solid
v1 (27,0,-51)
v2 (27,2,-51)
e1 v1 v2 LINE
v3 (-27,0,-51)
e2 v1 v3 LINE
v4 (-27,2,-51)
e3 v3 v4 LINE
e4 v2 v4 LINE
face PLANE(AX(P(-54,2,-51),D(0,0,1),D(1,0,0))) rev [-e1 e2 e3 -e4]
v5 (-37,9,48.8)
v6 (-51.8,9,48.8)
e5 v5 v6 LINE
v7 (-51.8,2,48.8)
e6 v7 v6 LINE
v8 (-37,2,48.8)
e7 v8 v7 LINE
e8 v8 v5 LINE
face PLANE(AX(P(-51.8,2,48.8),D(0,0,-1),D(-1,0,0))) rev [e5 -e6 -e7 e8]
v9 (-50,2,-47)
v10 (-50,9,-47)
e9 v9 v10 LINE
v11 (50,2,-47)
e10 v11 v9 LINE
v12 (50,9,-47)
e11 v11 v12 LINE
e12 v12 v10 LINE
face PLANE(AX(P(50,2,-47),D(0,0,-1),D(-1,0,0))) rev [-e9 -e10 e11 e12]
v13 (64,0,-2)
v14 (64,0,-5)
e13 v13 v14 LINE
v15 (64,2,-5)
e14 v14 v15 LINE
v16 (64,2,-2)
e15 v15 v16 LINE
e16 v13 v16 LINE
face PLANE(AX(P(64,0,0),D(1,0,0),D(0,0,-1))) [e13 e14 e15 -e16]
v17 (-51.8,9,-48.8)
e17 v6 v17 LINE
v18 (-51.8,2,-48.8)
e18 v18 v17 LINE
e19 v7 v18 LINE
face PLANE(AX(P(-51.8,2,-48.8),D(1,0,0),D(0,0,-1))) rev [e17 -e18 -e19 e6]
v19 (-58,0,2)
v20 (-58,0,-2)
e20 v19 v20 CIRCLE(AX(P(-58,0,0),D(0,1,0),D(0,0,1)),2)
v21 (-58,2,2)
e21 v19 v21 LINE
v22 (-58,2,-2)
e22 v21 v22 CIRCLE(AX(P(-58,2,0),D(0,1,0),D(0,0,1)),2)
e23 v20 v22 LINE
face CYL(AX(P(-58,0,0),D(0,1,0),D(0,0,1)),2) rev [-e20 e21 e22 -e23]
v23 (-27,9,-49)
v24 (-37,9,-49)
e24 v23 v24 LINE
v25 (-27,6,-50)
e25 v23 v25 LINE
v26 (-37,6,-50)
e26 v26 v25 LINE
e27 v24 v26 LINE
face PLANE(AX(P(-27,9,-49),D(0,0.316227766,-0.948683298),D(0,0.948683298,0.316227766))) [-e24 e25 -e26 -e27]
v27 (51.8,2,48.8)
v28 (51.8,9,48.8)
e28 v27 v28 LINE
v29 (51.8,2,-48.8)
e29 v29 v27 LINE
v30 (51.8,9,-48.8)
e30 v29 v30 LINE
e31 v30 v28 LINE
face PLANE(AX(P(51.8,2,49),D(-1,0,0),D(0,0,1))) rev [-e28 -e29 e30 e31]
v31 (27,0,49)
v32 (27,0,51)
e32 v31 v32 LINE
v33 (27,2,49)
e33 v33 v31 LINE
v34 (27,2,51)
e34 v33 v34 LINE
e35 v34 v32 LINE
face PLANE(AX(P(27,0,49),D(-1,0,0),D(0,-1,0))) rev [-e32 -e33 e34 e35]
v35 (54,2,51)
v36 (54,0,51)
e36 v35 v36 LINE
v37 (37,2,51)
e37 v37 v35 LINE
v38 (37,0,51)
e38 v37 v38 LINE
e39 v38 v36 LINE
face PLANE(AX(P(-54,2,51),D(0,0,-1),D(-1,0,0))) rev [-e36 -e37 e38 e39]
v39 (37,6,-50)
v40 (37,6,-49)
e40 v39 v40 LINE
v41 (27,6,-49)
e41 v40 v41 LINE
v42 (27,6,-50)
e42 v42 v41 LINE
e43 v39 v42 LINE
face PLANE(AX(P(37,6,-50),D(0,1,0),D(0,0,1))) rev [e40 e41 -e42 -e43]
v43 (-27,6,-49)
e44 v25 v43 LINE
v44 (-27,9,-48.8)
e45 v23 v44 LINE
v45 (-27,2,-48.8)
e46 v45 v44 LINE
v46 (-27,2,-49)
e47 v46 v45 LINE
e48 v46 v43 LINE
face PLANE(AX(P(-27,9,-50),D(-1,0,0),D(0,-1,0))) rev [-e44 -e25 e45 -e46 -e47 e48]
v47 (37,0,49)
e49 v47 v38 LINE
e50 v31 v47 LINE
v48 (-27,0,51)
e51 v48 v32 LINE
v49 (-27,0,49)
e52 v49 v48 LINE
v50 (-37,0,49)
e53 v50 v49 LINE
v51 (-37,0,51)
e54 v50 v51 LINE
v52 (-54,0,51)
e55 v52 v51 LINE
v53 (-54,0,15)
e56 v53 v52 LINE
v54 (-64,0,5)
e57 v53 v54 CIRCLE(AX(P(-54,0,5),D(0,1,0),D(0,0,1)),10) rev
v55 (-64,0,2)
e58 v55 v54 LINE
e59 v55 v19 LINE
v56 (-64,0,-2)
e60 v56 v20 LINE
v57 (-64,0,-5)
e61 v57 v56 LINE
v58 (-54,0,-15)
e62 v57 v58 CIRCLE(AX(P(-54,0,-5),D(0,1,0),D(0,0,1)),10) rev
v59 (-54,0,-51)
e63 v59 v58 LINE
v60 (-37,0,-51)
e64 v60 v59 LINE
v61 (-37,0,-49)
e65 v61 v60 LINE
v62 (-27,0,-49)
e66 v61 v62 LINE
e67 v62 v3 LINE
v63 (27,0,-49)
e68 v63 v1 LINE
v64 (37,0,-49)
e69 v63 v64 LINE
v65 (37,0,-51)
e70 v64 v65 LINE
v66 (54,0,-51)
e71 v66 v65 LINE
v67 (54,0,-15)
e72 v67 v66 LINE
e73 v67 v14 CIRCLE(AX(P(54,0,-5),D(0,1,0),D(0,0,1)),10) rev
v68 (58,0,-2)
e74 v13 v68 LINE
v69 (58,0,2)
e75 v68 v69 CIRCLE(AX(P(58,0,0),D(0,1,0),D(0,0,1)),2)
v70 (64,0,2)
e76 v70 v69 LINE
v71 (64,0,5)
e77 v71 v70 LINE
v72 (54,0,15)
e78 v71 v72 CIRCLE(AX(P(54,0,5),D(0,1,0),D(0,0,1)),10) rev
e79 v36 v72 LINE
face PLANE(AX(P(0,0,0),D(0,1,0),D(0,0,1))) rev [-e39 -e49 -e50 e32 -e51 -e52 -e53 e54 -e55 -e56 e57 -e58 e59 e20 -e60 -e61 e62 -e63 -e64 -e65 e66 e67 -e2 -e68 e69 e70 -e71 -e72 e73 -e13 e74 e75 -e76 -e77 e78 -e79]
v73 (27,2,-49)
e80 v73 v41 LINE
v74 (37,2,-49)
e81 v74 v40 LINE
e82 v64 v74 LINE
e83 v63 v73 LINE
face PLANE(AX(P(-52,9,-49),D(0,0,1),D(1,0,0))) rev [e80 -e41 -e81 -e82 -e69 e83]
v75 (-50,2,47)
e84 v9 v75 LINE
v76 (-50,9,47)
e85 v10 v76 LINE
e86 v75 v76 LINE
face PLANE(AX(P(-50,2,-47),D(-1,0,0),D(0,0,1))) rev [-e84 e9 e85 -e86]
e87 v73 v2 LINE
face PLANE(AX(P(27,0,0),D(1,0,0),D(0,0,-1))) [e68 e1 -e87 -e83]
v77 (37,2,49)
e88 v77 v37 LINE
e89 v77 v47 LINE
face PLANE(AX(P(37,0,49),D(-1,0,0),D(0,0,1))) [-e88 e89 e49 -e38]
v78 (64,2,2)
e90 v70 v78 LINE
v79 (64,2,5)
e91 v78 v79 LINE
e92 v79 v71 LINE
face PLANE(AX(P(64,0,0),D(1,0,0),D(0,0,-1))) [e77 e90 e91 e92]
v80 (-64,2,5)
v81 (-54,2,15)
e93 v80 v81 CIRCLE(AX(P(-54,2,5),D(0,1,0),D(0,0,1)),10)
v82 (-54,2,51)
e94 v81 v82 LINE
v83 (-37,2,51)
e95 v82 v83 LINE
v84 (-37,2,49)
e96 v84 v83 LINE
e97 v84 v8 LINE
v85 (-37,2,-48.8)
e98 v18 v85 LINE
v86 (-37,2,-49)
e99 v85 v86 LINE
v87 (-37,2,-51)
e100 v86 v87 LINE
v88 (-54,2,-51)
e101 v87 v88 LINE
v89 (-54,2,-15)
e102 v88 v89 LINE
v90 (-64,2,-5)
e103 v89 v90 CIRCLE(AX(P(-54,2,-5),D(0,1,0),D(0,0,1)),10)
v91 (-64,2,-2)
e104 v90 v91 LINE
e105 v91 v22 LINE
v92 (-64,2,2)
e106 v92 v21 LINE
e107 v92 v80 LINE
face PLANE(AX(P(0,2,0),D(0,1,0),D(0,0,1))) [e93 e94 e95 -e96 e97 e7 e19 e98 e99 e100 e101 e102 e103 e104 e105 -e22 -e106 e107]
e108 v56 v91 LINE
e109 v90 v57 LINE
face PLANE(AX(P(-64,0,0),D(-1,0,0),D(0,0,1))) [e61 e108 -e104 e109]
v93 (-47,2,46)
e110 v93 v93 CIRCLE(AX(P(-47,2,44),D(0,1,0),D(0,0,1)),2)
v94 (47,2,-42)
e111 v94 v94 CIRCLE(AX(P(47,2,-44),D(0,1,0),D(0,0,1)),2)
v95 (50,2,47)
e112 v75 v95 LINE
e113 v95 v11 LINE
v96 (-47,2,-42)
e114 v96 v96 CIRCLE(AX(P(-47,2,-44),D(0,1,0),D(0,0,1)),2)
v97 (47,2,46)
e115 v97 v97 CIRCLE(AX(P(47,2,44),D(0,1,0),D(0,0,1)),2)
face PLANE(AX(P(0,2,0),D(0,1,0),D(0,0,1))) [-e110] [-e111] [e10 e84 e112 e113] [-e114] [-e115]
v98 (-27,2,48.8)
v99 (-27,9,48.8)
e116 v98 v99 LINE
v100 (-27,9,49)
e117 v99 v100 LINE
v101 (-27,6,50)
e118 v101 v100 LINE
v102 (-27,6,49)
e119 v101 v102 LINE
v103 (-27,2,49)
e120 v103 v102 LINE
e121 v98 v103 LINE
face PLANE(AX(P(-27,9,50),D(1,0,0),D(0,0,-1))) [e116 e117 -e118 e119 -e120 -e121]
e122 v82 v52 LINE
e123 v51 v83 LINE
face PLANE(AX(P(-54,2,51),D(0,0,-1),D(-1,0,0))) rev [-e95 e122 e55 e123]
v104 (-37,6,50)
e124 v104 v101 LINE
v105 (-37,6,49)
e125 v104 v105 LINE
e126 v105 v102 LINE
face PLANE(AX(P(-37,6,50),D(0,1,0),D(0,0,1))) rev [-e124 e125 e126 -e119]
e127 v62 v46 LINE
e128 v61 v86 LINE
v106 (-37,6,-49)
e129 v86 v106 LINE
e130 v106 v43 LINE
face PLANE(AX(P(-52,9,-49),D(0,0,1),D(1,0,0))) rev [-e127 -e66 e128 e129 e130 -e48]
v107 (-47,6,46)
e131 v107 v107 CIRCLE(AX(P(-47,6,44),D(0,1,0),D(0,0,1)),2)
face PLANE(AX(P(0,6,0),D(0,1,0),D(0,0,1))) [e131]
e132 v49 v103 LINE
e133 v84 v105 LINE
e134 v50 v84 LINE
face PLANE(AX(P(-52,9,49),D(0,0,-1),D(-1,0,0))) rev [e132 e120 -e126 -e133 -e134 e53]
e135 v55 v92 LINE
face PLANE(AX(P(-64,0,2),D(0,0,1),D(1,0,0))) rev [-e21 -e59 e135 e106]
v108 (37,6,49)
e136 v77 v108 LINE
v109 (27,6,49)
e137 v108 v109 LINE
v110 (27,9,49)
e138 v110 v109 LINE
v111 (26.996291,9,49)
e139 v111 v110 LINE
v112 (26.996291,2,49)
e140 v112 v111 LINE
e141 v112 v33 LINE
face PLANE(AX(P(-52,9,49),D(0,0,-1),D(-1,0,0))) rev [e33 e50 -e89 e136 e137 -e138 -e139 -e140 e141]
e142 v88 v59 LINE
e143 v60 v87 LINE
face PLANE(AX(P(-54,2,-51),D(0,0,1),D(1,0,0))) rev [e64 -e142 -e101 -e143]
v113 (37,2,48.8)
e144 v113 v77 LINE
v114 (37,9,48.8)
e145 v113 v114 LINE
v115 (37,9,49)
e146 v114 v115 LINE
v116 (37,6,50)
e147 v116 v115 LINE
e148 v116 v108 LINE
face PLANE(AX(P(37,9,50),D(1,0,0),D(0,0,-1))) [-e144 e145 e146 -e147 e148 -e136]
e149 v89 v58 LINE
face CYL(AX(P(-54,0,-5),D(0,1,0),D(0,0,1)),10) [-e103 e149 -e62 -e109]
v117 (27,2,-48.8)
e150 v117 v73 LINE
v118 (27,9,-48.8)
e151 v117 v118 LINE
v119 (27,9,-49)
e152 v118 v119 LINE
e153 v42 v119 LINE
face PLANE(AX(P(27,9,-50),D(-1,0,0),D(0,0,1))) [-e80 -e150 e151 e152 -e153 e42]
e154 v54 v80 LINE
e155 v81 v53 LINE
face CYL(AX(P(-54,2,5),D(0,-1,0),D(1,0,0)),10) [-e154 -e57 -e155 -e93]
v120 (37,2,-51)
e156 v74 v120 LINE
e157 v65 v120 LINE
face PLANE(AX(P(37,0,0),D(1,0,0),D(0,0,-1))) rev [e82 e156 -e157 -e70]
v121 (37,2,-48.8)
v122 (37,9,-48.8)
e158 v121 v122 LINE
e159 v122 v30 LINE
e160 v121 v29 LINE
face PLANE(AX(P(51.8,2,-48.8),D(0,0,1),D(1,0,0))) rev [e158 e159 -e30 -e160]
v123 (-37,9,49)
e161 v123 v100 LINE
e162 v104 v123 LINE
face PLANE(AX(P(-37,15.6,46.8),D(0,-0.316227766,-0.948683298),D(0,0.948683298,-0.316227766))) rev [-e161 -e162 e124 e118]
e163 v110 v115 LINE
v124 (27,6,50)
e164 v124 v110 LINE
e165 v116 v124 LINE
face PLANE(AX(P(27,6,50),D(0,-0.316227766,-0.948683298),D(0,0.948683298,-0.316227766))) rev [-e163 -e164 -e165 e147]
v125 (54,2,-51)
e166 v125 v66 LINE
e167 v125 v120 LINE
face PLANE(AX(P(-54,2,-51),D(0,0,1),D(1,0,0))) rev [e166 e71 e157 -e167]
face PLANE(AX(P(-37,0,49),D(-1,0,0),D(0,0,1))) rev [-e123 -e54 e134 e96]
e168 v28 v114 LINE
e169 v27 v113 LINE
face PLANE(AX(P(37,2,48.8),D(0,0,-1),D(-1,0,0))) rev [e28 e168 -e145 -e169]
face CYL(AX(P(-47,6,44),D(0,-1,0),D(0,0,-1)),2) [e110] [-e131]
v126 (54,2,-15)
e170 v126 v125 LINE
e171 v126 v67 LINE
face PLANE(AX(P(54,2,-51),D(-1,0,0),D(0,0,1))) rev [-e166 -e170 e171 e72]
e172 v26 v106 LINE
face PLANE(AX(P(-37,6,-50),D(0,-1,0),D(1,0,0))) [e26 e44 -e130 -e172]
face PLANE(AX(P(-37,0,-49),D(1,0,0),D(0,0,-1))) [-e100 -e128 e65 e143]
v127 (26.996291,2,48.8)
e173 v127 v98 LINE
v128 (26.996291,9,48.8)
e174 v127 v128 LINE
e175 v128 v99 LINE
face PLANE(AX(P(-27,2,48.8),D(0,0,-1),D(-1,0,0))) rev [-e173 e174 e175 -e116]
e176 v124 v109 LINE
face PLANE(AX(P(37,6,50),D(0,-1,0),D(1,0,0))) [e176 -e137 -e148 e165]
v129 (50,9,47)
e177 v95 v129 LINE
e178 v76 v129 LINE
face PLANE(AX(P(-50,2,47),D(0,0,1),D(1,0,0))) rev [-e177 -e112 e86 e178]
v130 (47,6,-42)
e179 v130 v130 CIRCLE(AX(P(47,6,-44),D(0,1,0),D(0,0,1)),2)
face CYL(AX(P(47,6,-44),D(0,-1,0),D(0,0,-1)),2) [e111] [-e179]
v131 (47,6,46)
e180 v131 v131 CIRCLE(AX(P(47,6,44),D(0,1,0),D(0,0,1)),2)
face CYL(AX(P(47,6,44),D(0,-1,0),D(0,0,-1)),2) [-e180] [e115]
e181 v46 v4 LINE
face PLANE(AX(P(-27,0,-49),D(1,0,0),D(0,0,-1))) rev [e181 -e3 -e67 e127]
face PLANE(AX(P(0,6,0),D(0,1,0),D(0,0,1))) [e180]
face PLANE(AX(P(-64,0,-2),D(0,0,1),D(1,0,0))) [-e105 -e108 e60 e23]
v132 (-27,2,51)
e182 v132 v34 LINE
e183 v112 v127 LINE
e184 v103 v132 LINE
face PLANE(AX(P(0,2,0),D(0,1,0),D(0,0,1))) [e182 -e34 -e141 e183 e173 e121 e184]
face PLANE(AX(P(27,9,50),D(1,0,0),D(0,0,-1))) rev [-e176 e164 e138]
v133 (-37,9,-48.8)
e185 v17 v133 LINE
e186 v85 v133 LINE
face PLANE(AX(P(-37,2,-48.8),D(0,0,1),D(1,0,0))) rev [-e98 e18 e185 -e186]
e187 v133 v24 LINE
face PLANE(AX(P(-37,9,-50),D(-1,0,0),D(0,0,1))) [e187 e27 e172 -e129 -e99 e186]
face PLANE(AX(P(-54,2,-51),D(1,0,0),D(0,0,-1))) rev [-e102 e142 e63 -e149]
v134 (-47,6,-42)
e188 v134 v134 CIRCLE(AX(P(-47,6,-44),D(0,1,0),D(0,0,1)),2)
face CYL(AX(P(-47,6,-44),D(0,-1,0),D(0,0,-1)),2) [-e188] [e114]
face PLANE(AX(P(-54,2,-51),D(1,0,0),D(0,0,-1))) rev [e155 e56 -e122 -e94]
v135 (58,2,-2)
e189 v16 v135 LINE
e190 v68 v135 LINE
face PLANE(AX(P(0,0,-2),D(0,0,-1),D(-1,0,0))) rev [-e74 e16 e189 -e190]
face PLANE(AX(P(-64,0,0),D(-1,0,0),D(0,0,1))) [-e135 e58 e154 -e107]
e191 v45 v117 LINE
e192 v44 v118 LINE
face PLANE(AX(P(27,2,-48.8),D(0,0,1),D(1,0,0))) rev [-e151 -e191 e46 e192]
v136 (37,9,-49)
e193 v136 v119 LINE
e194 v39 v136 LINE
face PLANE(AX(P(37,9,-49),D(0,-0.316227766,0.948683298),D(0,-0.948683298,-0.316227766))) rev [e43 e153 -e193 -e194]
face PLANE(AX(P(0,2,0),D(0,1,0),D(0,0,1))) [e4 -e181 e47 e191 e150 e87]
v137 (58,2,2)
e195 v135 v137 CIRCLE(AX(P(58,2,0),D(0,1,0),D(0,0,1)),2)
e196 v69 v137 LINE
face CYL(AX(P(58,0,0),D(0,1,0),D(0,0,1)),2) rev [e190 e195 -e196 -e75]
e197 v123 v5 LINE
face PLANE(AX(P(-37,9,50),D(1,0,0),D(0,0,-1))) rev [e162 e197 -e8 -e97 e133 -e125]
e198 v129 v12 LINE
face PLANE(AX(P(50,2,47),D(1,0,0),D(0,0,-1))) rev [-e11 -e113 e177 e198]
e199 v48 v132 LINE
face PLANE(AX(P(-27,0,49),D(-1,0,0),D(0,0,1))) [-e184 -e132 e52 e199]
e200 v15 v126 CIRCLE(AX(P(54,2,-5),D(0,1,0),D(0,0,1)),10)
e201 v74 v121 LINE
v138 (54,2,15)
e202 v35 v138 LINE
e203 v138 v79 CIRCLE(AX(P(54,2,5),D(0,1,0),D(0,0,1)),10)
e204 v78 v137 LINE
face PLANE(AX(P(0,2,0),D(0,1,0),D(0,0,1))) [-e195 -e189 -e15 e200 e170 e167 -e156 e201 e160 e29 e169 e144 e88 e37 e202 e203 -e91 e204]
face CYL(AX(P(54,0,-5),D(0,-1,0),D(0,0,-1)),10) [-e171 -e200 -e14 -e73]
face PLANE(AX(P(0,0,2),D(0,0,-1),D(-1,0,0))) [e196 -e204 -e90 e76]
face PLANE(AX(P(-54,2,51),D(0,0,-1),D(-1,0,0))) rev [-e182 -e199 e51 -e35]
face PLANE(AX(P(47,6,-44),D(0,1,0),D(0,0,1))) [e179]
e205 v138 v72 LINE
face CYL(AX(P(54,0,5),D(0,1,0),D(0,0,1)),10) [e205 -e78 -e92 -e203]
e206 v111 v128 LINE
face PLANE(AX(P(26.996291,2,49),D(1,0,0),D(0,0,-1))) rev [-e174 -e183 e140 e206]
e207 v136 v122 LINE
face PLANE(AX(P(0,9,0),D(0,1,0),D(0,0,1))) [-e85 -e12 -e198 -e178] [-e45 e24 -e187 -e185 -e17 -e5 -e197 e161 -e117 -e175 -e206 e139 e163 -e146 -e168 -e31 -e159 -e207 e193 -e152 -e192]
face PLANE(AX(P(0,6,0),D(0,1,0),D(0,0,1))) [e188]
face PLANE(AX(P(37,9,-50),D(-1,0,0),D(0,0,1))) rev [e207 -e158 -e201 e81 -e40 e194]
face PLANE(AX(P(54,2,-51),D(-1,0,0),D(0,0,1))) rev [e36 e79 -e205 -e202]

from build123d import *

# Parameters (mm, degrees)
SKETCH1_W            = 108
SKETCH1_H            = 102
BOSS_EXTRUDE1_DEPTH  = 2
SKETCH2_W            = 104
SKETCH2_H            = 98
BOSS_EXTRUDE2_DEPTH  = 7
SKETCH3_W            = 100
SKETCH3_H            = 94
CUT_EXTRUDE1_DEPTH   = 7
SKETCH4_W            = 10
SKETCH4_H            = 3
BOSS_EXTRUDE6_DEPTH  = 1
CUT_EXTRUDE2_DEPTH   = 10
SKETCH6_W            = 10
SKETCH6_H            = 3
BOSS_EXTRUDE7_DEPTH  = 1
CUT_EXTRUDE3_DEPTH   = 10
SKETCH9_W            = 10
SKETCH9_H            = 3
BOSS_EXTRUDE9_DEPTH  = 1
CUT_EXTRUDE4_DEPTH   = 10
SKETCH11_W           = 10
SKETCH11_H           = 3
BOSS_EXTRUDE10_DEPTH = 1
CUT_EXTRUDE5_DEPTH   = 10
SKETCH20_W           = 10
SKETCH20_H           = 2
CUT_EXTRUDE7_DEPTH   = 2
SKETCH21_W           = 10
SKETCH21_H           = 2
CUT_EXTRUDE8_DEPTH   = 2
SKETCH22_W           = 10
SKETCH22_H           = 2
CUT_EXTRUDE9_DEPTH   = 2
SKETCH23_W           = 10
SKETCH23_H           = 2
CUT_EXTRUDE11_DEPTH  = 2
SKETCH24_R           = 2
BOSS_EXTRUDE11_DEPTH = 4
BOSS_EXTRUDE12_DEPTH = 4
BOSS_EXTRUDE13_DEPTH = 4
BOSS_EXTRUDE14_DEPTH = 4
SKETCH28_W           = 30
SKETCH28_H           = 2
BOSS_EXTRUDE15_DEPTH = 10
SKETCH29_R           = 2
SKETCH29_W           = 6
SKETCH29_H           = 4
CUT_EXTRUDE12_DEPTH  = 2
FILLET1_R            = 10
SKETCH30_W           = 30
SKETCH30_H           = 1
BOSS_EXTRUDE16_DEPTH = 10
CUT_EXTRUDE13_DEPTH  = 2
FILLET2_R            = 10
SKETCH33_W           = 0.2
SKETCH33_H           = 98
CUT_EXTRUDE14_DEPTH  = 7
SKETCH34_W           = 14.8
SKETCH34_H           = 0.2
CUT_EXTRUDE15_DEPTH  = 7
SKETCH35_W           = 54
SKETCH35_H           = 0.2
CUT_EXTRUDE16_DEPTH  = 7
SKETCH36_W           = 15
SKETCH36_H           = 0.2
CUT_EXTRUDE17_DEPTH  = 7
SKETCH37_W           = 0.2
SKETCH37_H           = 97.8
CUT_EXTRUDE18_DEPTH  = 7
SKETCH39_W           = 14.8
SKETCH39_H           = 0.2
CUT_EXTRUDE19_DEPTH  = 7
SKETCH41_W           = 53.996290736
SKETCH41_H           = 0.2
CUT_EXTRUDE20_DEPTH  = 7
SKETCH42_W           = 14.8
SKETCH42_H           = 0.2
CUT_EXTRUDE21_DEPTH  = 7


with BuildPart() as part:
    # Sketch1 → Boss-Extrude1 (new body)
    with BuildSketch(Plane(origin=(0, 0, 0), x_dir=(1, 0, 0), z_dir=(0, 1, 0))):
        Rectangle(SKETCH1_W, SKETCH1_H)
    extrude(amount=BOSS_EXTRUDE1_DEPTH)

    # Sketch2 → Boss-Extrude2 (add)
    with BuildSketch(Plane(origin=(0, 2, 0), x_dir=(1, 0, 0), z_dir=(0, 1, 0))):
        Rectangle(SKETCH2_W, SKETCH2_H)
    extrude(amount=BOSS_EXTRUDE2_DEPTH)

    # Sketch3 → Cut-Extrude1 (cut)
    with BuildSketch(Plane(origin=(0, 9, 0), x_dir=(1, 0, 0), z_dir=(0, 1, 0))):
        Rectangle(SKETCH3_W, SKETCH3_H)
    extrude(amount=-CUT_EXTRUDE1_DEPTH, mode=Mode.SUBTRACT)

    # Sketch4 → Boss-Extrude6 (add)
    with BuildSketch(Plane.XY.offset(49)):
        with Locations((-32, 7.5)):
            Rectangle(SKETCH4_W, SKETCH4_H)
    extrude(amount=BOSS_EXTRUDE6_DEPTH)

    # Sketch5 → Cut-Extrude2 (cut)
    with BuildSketch(Plane(origin=(-27, 0, 0), x_dir=(0, 0, -1), z_dir=(1, 0, 0))):
        Polygon((-50, 6), (-49, 9), (-50, 9), align=None)
    extrude(amount=-CUT_EXTRUDE2_DEPTH, mode=Mode.SUBTRACT)

    # Sketch6 → Boss-Extrude7 (add)
    with BuildSketch(Plane.XY.offset(49)):
        with Locations((32, 7.5)):
            Rectangle(SKETCH6_W, SKETCH6_H)
    extrude(amount=BOSS_EXTRUDE7_DEPTH)

    # Sketch7 → Cut-Extrude3 (cut)
    with BuildSketch(Plane(origin=(37, 0, 0), x_dir=(0, 0, -1), z_dir=(1, 0, 0))):
        Polygon((-50, 6), (-49, 9), (-50, 9), align=None)
    extrude(amount=-CUT_EXTRUDE3_DEPTH, mode=Mode.SUBTRACT)

    # Sketch9 → Boss-Extrude9 (add)
    with BuildSketch(Plane(origin=(0, 0, -49), x_dir=(-1, 0, 0), z_dir=(0, 0, -1))):
        with Locations((-32, 7.5)):
            Rectangle(SKETCH9_W, SKETCH9_H)
    extrude(amount=BOSS_EXTRUDE9_DEPTH)

    # Sketch10 → Cut-Extrude4 (cut)
    with BuildSketch(Plane.ZY.offset(-27)):
        Polygon((-49, 9), (-50, 6), (-50, 9), align=None)
    extrude(amount=-CUT_EXTRUDE4_DEPTH, mode=Mode.SUBTRACT)

    # Sketch11 → Boss-Extrude10 (add)
    with BuildSketch(Plane(origin=(0, 0, -49), x_dir=(-1, 0, 0), z_dir=(0, 0, -1))):
        with Locations((32, 7.5)):
            Rectangle(SKETCH11_W, SKETCH11_H)
    extrude(amount=BOSS_EXTRUDE10_DEPTH)

    # Sketch12 → Cut-Extrude5 (cut)
    with BuildSketch(Plane.ZY.offset(37)):
        Polygon((-49, 9), (-50, 6), (-50, 9), align=None)
    extrude(amount=-CUT_EXTRUDE5_DEPTH, mode=Mode.SUBTRACT)

    # Sketch20 → Cut-Extrude7 (cut)
    with BuildSketch(Plane.XY.offset(51)):
        with Locations((32, 1)):
            Rectangle(SKETCH20_W, SKETCH20_H)
    extrude(amount=-CUT_EXTRUDE7_DEPTH, mode=Mode.SUBTRACT)

    # Sketch21 → Cut-Extrude8 (cut)
    with BuildSketch(Plane(origin=(0, 2, 0), x_dir=(1, 0, 0), z_dir=(0, 1, 0))):
        with Locations((-32, -50)):
            Rectangle(SKETCH21_W, SKETCH21_H)
    extrude(amount=-CUT_EXTRUDE8_DEPTH, mode=Mode.SUBTRACT)

    # Sketch22 → Cut-Extrude9 (cut)
    with BuildSketch(Plane(origin=(0, 2, 0), x_dir=(1, 0, 0), z_dir=(0, 1, 0))):
        with Locations((32, 50)):
            Rectangle(SKETCH22_W, SKETCH22_H)
    extrude(amount=-CUT_EXTRUDE9_DEPTH, mode=Mode.SUBTRACT)

    # Sketch23 → Cut-Extrude11 (cut)
    with BuildSketch(Plane(origin=(0, 2, 0), x_dir=(1, 0, 0), z_dir=(0, 1, 0))):
        with Locations((-32, 50)):
            Rectangle(SKETCH23_W, SKETCH23_H)
    extrude(amount=-CUT_EXTRUDE11_DEPTH, mode=Mode.SUBTRACT)

    # Sketch24 → Boss-Extrude11 (add)
    with BuildSketch(Plane(origin=(0, 2, 0), x_dir=(1, 0, 0), z_dir=(0, 1, 0))):
        with Locations(Location((47, 44, 0), (0, 0, 270))):
            Circle(SKETCH24_R)
    extrude(amount=BOSS_EXTRUDE11_DEPTH)

    # Sketch25 → Boss-Extrude12 (add)
    with BuildSketch(Plane(origin=(0, 2, 0), x_dir=(1, 0, 0), z_dir=(0, 1, 0))):
        with BuildLine():
            ThreePointArc((-45, 44), (-45.585786438, 45.414213562), (-47, 46))
            Line((-47, 46), (-47, 44))
            Line((-47, 44), (-49, 44))
            ThreePointArc((-49, 44), (-47, 42), (-45, 44))
        make_face()
        with BuildLine():
            Line((-47, 44), (-47, 46))
            ThreePointArc((-47, 46), (-48.414213562, 45.414213562), (-49, 44))
            Line((-49, 44), (-47, 44))
        make_face()
    extrude(amount=BOSS_EXTRUDE12_DEPTH)

    # Sketch26 → Boss-Extrude13 (add)
    with BuildSketch(Plane(origin=(0, 2, 0), x_dir=(1, 0, 0), z_dir=(0, 1, 0))):
        with BuildLine():
            ThreePointArc((-49, -44), (-48.414213562, -45.414213562), (-47, -46))
            Line((-47, -46), (-47, -44))
            Line((-47, -44), (-49, -44))
        make_face()
        with BuildLine():
            Line((-47, -44), (-47, -46))
            ThreePointArc((-47, -46), (-45.585786438, -45.414213562), (-45, -44))
            ThreePointArc((-45, -44), (-47, -42), (-49, -44))
            Line((-49, -44), (-47, -44))
        make_face()
    extrude(amount=BOSS_EXTRUDE13_DEPTH)

    # Sketch27 → Boss-Extrude14 (add)
    with BuildSketch(Plane(origin=(0, 2, 0), x_dir=(1, 0, 0), z_dir=(0, 1, 0))):
        with BuildLine():
            ThreePointArc((49, -44), (45.585786438, -42.585786438), (47, -46))
            Line((47, -46), (47, -44))
            Line((47, -44), (49, -44))
        make_face()
        with BuildLine():
            Line((47, -44), (47, -46))
            ThreePointArc((47, -46), (48.414213562, -45.414213562), (49, -44))
            Line((49, -44), (47, -44))
        make_face()
    extrude(amount=BOSS_EXTRUDE14_DEPTH)

    # Sketch28 → Boss-Extrude15 (add)
    with BuildSketch(Plane.ZY.offset(54)):
        with Locations((0, 1)):
            Rectangle(SKETCH28_W, SKETCH28_H)
    extrude(amount=BOSS_EXTRUDE15_DEPTH)

    # Sketch29 → Cut-Extrude12 (cut)
    with BuildSketch(Plane(origin=(0, 2, 0), x_dir=(1, 0, 0), z_dir=(0, 1, 0))):
        with Locations((-58, 0)):
            Circle(SKETCH29_R)
        with Locations((-61, 0)):
            Rectangle(SKETCH29_W, SKETCH29_H)
    extrude(amount=-CUT_EXTRUDE12_DEPTH, mode=Mode.SUBTRACT)

    # Fillet1
    fillet1_edges = [part.edges().sort_by_distance(p)[0] for p in [
        (-64, 1, 15),
        (-64, 1, -15),
    ]]
    fillet(fillet1_edges, radius=FILLET1_R - 0.0001)  # a hair under: the kernel refuses the full size

    # Sketch30 → Boss-Extrude16 (add)
    with BuildSketch(Plane(origin=(54, 0, 0), x_dir=(0, 0, -1), z_dir=(1, 0, 0))):
        with Locations((0, 1.5)):
            Rectangle(SKETCH30_W, SKETCH30_H)
        with Locations((0, 0.5)):
            Rectangle(SKETCH30_W, SKETCH30_H)
    extrude(amount=BOSS_EXTRUDE16_DEPTH)

    # Sketch32 → Cut-Extrude13 (cut)
    with BuildSketch(Plane(origin=(0, 2, 0), x_dir=(1, 0, 0), z_dir=(0, 1, 0))):
        with BuildLine():
            Line((58, -2), (64, -2))
            Line((64, -2), (64, 2))
            Line((64, 2), (58, 2))
            ThreePointArc((58, 2), (59.414213562, 1.414213562), (60, 0))
            ThreePointArc((60, 0), (59.414213562, -1.414213562), (58, -2))
        make_face()
        with BuildLine():
            ThreePointArc((58, 2), (56, 0), (58, -2))
            Line((58, -2), (58, 2))
        make_face()
        with BuildLine():
            Line((58, 2), (58, -2))
            ThreePointArc((58, -2), (59.414213562, -1.414213562), (60, 0))
            ThreePointArc((60, 0), (59.414213562, 1.414213562), (58, 2))
        make_face()
    extrude(amount=-CUT_EXTRUDE13_DEPTH, mode=Mode.SUBTRACT)

    # Fillet2
    fillet2_edges = [part.edges().sort_by_distance(p)[0] for p in [
        (64, 1, -15),
        (64, 1, 15),
    ]]
    fillet(fillet2_edges, radius=FILLET2_R - 0.0001)  # a hair under: the kernel refuses the full size

    # Sketch33 → Cut-Extrude14 (cut)
    with BuildSketch(Plane(origin=(0, 9, 0), x_dir=(1, 0, 0), z_dir=(0, 1, 0))):
        with Locations((51.9, 0)):
            Rectangle(SKETCH33_W, SKETCH33_H)
    extrude(amount=-CUT_EXTRUDE14_DEPTH, mode=Mode.SUBTRACT)

    # Sketch34 → Cut-Extrude15 (cut)
    with BuildSketch(Plane(origin=(0, 9, 0), x_dir=(1, 0, 0), z_dir=(0, 1, 0))):
        with Locations((44.4, 48.9)):
            Rectangle(SKETCH34_W, SKETCH34_H)
    extrude(amount=-CUT_EXTRUDE15_DEPTH, mode=Mode.SUBTRACT)

    # Sketch35 → Cut-Extrude16 (cut)
    with BuildSketch(Plane(origin=(0, 9, 0), x_dir=(1, 0, 0), z_dir=(0, 1, 0))):
        with Locations((0, 48.9)):
            Rectangle(SKETCH35_W, SKETCH35_H)
    extrude(amount=-CUT_EXTRUDE16_DEPTH, mode=Mode.SUBTRACT)

    # Sketch36 → Cut-Extrude17 (cut)
    with BuildSketch(Plane(origin=(0, 9, 0), x_dir=(1, 0, 0), z_dir=(0, 1, 0))):
        with Locations((-44.5, 48.9)):
            Rectangle(SKETCH36_W, SKETCH36_H)
    extrude(amount=-CUT_EXTRUDE17_DEPTH, mode=Mode.SUBTRACT)

    # Sketch37 → Cut-Extrude18 (cut)
    with BuildSketch(Plane(origin=(0, 9, 0), x_dir=(1, 0, 0), z_dir=(0, 1, 0))):
        with Locations((-51.9, -0.1)):
            Rectangle(SKETCH37_W, SKETCH37_H)
    extrude(amount=-CUT_EXTRUDE18_DEPTH, mode=Mode.SUBTRACT)

    # Sketch39 → Cut-Extrude19 (cut)
    with BuildSketch(Plane(origin=(0, 9, 0), x_dir=(1, 0, 0), z_dir=(0, 1, 0))):
        with Locations((-44.4, -48.9)):
            Rectangle(SKETCH39_W, SKETCH39_H)
    extrude(amount=-CUT_EXTRUDE19_DEPTH, mode=Mode.SUBTRACT)

    # Sketch41 → Cut-Extrude20 (cut)
    with BuildSketch(Plane(origin=(0, 9, 0), x_dir=(1, 0, 0), z_dir=(0, 1, 0))):
        with Locations((-0.001854632, -48.9)):
            Rectangle(SKETCH41_W, SKETCH41_H)
    extrude(amount=-CUT_EXTRUDE20_DEPTH, mode=Mode.SUBTRACT)

    # Sketch42 → Cut-Extrude21 (cut)
    with BuildSketch(Plane(origin=(0, 9, 0), x_dir=(1, 0, 0), z_dir=(0, 1, 0))):
        with Locations((44.4, -48.9)):
            Rectangle(SKETCH42_W, SKETCH42_H)
    extrude(amount=-CUT_EXTRUDE21_DEPTH, mode=Mode.SUBTRACT)


solid = part.part
